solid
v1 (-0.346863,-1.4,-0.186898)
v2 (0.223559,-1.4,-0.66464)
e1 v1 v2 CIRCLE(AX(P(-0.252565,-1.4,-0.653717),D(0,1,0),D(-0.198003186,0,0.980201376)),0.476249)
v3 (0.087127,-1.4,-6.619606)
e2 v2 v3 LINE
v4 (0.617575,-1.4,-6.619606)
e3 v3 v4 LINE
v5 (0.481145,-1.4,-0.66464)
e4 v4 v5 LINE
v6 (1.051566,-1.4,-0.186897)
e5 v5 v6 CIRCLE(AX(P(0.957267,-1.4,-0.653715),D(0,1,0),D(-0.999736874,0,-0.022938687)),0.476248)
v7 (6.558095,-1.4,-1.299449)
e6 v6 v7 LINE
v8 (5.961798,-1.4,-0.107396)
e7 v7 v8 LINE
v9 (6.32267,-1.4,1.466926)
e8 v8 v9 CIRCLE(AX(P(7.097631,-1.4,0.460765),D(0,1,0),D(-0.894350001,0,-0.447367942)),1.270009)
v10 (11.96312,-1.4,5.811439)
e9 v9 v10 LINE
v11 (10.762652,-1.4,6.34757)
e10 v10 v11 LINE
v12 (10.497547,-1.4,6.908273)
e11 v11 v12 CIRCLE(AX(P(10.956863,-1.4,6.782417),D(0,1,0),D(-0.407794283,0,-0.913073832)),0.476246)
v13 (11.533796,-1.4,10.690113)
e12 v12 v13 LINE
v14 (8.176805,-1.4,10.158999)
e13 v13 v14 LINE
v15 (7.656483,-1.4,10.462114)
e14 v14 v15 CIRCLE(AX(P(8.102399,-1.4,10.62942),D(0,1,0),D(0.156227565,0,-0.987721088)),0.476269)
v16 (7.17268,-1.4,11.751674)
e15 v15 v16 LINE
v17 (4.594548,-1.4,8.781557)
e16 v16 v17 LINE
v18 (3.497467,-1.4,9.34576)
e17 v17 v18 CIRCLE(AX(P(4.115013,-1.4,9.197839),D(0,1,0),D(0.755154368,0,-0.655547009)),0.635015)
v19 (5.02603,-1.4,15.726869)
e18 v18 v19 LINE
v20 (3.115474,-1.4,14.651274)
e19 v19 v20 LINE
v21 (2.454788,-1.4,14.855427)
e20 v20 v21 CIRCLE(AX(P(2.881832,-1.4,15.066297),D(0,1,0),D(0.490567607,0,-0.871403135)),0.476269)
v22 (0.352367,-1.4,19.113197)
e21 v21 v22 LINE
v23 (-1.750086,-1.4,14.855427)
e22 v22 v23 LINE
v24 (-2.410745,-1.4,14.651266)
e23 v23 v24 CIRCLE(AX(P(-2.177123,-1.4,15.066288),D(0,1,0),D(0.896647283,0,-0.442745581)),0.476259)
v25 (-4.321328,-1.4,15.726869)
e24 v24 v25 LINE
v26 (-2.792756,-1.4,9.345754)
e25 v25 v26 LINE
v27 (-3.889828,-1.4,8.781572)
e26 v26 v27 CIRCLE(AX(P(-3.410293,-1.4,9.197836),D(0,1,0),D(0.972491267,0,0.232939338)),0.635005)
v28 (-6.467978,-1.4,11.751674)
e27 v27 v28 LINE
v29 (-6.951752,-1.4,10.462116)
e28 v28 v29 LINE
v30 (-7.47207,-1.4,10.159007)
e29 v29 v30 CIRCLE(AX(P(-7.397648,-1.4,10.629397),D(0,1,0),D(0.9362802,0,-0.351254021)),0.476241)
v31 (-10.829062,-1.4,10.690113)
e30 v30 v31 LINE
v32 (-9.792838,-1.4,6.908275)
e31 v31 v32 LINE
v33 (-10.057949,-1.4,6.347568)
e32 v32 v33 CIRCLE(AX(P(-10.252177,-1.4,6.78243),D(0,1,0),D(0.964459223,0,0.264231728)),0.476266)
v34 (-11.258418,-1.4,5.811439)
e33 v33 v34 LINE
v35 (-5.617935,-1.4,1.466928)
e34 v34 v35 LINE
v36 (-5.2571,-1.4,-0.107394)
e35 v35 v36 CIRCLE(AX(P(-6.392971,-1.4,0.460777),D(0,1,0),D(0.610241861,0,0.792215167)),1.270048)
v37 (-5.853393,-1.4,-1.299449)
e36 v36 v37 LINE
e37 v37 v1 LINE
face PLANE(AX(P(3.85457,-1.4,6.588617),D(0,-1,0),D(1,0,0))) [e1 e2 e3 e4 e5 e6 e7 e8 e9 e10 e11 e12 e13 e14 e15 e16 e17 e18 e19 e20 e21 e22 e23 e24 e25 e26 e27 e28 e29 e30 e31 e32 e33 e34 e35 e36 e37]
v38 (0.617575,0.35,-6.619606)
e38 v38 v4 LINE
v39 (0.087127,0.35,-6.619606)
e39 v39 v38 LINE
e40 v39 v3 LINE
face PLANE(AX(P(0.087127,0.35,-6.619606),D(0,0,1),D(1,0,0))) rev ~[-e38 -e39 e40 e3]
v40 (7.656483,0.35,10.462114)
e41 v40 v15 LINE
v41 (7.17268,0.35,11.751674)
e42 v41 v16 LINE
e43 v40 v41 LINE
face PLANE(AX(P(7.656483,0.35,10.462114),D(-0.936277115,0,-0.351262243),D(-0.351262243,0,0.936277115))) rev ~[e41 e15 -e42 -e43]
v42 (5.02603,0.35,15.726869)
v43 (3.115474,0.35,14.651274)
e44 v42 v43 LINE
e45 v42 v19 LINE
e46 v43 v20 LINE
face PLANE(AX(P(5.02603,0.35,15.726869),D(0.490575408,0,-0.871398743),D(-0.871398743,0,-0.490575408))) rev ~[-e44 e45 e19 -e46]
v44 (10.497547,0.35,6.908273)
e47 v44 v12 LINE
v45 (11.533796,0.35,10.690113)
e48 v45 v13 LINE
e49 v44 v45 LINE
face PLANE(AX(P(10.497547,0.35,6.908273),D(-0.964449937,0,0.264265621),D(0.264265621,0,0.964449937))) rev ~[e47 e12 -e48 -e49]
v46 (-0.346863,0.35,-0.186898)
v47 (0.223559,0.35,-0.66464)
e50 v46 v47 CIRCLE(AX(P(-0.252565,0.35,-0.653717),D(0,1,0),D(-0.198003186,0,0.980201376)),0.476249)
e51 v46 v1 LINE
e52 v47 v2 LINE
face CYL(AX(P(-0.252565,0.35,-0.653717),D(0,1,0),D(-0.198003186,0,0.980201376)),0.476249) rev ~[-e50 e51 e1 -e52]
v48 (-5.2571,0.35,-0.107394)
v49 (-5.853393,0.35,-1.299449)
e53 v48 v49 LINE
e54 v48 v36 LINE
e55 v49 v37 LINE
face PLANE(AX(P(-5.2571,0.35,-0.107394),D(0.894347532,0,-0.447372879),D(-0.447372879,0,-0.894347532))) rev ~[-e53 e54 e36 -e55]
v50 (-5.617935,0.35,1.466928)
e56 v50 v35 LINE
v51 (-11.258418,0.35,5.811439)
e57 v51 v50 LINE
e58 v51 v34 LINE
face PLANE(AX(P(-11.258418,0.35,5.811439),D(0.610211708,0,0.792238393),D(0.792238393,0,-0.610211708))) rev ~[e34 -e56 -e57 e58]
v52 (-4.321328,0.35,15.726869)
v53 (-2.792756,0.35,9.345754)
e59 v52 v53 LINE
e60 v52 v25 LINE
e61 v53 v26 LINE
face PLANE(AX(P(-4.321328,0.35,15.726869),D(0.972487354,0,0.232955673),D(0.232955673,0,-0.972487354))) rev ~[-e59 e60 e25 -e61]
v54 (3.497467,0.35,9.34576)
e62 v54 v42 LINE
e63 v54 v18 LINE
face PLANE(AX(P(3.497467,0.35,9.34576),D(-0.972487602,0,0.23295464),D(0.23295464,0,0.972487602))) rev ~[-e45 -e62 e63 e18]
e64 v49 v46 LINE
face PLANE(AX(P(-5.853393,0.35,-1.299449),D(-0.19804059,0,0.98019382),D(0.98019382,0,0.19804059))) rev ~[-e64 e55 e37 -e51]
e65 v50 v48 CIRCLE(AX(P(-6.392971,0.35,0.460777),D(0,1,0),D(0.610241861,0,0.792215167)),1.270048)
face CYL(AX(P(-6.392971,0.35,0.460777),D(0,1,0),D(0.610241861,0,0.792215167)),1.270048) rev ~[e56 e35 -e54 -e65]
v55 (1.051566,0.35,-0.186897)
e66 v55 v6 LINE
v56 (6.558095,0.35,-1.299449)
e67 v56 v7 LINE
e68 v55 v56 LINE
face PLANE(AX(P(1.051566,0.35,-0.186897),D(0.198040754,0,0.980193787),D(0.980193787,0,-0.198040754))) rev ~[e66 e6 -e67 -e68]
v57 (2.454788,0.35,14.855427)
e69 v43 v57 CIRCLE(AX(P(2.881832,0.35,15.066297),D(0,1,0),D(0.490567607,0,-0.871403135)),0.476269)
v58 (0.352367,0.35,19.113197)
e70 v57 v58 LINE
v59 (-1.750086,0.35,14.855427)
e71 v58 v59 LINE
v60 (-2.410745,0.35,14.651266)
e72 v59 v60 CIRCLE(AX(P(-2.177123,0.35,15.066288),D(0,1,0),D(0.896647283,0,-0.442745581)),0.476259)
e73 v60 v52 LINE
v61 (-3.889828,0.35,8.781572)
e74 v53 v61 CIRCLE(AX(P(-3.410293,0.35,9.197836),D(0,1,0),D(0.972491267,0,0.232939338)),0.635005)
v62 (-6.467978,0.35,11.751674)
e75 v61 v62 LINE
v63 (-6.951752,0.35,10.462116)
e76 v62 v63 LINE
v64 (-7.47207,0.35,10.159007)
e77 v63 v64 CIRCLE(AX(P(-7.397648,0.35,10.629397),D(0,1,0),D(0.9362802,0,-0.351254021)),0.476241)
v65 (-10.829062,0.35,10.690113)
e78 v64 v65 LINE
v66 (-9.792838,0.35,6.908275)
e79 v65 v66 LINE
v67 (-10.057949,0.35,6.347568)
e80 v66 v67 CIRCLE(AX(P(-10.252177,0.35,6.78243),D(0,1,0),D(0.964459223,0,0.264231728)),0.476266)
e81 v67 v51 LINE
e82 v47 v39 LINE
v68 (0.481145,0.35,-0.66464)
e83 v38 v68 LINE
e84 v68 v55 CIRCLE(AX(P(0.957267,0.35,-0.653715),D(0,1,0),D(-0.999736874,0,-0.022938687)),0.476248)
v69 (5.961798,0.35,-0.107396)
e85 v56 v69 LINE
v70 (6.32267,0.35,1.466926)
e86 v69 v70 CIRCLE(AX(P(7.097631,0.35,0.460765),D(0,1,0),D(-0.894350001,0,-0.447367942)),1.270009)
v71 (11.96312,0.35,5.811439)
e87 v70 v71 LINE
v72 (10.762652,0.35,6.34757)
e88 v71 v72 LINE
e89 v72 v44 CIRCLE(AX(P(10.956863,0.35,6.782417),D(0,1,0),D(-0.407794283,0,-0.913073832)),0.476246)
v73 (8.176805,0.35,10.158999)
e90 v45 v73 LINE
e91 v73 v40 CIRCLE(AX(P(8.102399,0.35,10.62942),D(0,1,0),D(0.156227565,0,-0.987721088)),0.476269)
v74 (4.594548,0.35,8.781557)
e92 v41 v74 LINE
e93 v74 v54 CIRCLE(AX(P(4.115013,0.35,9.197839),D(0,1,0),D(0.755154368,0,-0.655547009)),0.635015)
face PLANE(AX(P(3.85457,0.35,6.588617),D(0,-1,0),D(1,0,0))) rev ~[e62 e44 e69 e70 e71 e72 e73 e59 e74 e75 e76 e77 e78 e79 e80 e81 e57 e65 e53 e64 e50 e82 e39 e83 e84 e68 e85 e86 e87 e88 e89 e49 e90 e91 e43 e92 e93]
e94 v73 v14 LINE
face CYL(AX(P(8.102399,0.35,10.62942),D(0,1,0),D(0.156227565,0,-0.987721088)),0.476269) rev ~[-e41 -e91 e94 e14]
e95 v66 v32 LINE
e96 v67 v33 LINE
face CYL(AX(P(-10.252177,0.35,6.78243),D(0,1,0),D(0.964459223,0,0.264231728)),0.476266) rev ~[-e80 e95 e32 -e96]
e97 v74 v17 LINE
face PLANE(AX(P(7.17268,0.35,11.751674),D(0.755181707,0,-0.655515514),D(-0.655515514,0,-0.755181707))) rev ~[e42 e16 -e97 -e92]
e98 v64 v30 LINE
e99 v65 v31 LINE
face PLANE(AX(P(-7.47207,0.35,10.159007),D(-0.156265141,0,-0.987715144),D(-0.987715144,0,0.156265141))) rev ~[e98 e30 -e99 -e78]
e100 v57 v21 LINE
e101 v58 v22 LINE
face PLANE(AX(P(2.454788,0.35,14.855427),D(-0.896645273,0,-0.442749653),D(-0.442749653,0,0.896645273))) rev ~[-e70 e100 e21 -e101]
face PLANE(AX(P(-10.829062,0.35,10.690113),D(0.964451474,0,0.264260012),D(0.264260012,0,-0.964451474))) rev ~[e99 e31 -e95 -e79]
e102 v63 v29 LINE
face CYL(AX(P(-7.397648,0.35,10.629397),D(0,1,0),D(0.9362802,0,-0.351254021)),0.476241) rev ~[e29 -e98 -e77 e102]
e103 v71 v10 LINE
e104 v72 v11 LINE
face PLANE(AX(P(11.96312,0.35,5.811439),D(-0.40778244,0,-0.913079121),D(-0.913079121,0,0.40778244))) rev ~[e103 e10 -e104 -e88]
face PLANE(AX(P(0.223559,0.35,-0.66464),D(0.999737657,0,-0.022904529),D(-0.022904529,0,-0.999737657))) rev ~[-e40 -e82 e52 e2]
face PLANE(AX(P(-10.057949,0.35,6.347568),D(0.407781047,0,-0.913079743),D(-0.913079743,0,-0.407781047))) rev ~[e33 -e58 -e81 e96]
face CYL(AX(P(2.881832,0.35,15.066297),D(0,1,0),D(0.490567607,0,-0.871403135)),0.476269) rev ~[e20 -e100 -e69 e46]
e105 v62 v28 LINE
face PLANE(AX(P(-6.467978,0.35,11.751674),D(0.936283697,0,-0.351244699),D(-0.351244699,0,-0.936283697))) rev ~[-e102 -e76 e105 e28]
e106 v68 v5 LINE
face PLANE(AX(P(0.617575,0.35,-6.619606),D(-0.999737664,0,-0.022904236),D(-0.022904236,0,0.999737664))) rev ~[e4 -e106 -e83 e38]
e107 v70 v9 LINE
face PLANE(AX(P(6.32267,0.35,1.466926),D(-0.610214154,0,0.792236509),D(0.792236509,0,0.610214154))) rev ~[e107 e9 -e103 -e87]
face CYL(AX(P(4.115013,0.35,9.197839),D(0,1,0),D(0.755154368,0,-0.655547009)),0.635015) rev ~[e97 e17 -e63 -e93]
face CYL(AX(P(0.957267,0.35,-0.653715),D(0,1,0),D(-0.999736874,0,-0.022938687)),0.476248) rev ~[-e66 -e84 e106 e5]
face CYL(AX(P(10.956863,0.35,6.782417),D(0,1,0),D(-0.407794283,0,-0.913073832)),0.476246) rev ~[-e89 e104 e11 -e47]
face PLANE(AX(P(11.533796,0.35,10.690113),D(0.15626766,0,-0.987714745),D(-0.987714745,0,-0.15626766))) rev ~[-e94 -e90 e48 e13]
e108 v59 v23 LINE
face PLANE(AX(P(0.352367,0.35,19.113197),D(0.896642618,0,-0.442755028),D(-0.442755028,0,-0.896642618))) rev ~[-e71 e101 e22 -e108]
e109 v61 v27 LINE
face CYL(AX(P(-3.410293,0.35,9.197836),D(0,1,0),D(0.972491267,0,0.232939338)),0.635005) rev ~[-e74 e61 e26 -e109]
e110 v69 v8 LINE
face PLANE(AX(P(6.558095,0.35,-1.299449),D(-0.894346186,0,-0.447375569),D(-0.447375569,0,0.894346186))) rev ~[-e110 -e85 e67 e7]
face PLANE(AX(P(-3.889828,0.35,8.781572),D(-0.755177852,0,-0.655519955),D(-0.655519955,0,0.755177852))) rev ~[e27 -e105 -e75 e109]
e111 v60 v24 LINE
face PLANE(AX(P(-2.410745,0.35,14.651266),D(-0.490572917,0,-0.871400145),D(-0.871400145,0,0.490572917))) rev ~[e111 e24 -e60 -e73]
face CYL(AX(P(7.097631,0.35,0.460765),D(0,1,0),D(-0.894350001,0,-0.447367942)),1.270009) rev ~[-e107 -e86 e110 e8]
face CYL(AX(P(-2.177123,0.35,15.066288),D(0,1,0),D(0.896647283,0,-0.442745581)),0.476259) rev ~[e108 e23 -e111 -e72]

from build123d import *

# Parameters (mm, degrees)
F1_DEPTH = 1.4
F2_SCALE = 1.25


# Not quite as in the source:
# - ends of sketch curves that miss each other by under 0.0002 mm in the source are joined


with BuildPart() as f1:
    # F0 (on Front) → F1 (new body)
    with BuildSketch(Plane.XZ):
        with BuildLine():
            Line((2.0343041438, 15.7069808039), (0.3523669438, 19.1131970039))
            Line((0.3523669438, 19.1131970039), (0.3523669438, -1.4730457961))
            Line((0.3523669438, -1.4730457961), (0.5645331438, -1.4730457961))
            Line((0.5645331438, -1.4730457961), (0.4553893438, 3.2909274039))
            ThreePointArc((0.4553893438, 3.2909274039), (0.5916556183, 3.5917542423), (0.9117258932, 3.6731219434))
            Line((0.9117258932, 3.6731219434), (5.3169493438, 2.7830798039))
            Line((5.3169493438, 2.7830798039), (4.8399119438, 3.7367228039))
            ThreePointArc((4.8399119438, 3.7367228039), (4.7582554065, 4.4182578922), (5.1286096155, 4.9961801528))
            Line((5.1286096155, 4.9961801528), (9.6409691438, 8.4717908039))
            Line((9.6409691438, 8.4717908039), (8.6805951438, 8.9006952039))
            ThreePointArc((8.6805951438, 8.9006952039), (8.4915257857, 9.0857200238), (8.4685111742, 9.3492575516))
            Line((8.4685111742, 9.3492575516), (9.2975103438, 12.3747294039))
            Line((9.2975103438, 12.3747294039), (6.6119175438, 11.9498382039))
            ThreePointArc((6.6119175438, 11.9498382039), (6.3606002996, 11.996951044), (6.1956594084, 12.1923309026))
            Line((6.1956594084, 12.1923309026), (5.8086171438, 13.2239784039))
            Line((5.8086171438, 13.2239784039), (3.7461117438, 10.8478846039))
            ThreePointArc((3.7461117438, 10.8478846039), (3.1301426273, 10.7291430881), (2.8684469448, 11.2992470593))
            Line((2.8684469448, 11.2992470593), (4.0912977438, 16.4041346039))
            Line((4.0912977438, 16.4041346039), (2.5628527438, 15.5436588039))
            ThreePointArc((2.5628527438, 15.5436588039), (2.2634525656, 15.511644492), (2.0343041438, 15.7069808039))
        make_face()
        with BuildLine():
            Line((0.3523669438, -1.4730457961), (0.3523669438, 19.1131970039))
            Line((0.3523669438, 19.1131970039), (-1.3295956562, 15.7069808039))
            ThreePointArc((-1.3295956562, 15.7069808039), (-1.5587335044, 15.5116477594), (-1.858122509, 15.5436523149))
            Line((-1.858122509, 15.5436523149), (-3.3865892562, 16.4041346039))
            Line((-3.3865892562, 16.4041346039), (-2.1637316562, 11.2992426039))
            ThreePointArc((-2.1637316562, 11.2992426039), (-2.4254367706, 10.7291417351), (-3.0413892842, 10.8478967322))
            Line((-3.0413892842, 10.8478967322), (-5.1039086562, 13.2239784039))
            Line((-5.1039086562, 13.2239784039), (-5.4909284562, 12.1923320039))
            ThreePointArc((-5.4909284562, 12.1923320039), (-5.6558664119, 11.996951044), (-5.9071825723, 11.9498450545))
            Line((-5.9071825723, 11.9498450545), (-8.5927764562, 12.3747294039))
            Line((-8.5927764562, 12.3747294039), (-7.7637966562, 9.3492592039))
            ThreePointArc((-7.7637966562, 9.3492592039), (-7.786817298, 9.0857200238), (-7.9758860019, 8.9006937389))
            Line((-7.9758860019, 8.9006937389), (-8.9362606562, 8.4717908039))
            Line((-8.9362606562, 8.4717908039), (-4.4238744562, 4.9961818039))
            ThreePointArc((-4.4238744562, 4.9961818039), (-4.0535446709, 4.4182480852), (-4.1352063244, 3.7367242387))
            Line((-4.1352063244, 3.7367242387), (-4.6122408562, 2.7830798039))
            Line((-4.6122408562, 2.7830798039), (-0.2070172562, 3.6731212039))
            ThreePointArc((-0.2070172562, 3.6731212039), (0.1130528694, 3.5917542423), (0.2493205388, 3.2909273719))
            Line((0.2493205388, 3.2909273719), (0.1401753438, -1.4730457961))
            Line((0.1401753438, -1.4730457961), (0.3523669438, -1.4730457961))
        make_face()
    extrude(amount=F1_DEPTH)


with BuildPart() as f1_1:
    # F2: moved
    add(f1.part.scale(F2_SCALE).moved(Location((-0.088091736, 0.35, -4.778299251))))


solid = f1_1.part
